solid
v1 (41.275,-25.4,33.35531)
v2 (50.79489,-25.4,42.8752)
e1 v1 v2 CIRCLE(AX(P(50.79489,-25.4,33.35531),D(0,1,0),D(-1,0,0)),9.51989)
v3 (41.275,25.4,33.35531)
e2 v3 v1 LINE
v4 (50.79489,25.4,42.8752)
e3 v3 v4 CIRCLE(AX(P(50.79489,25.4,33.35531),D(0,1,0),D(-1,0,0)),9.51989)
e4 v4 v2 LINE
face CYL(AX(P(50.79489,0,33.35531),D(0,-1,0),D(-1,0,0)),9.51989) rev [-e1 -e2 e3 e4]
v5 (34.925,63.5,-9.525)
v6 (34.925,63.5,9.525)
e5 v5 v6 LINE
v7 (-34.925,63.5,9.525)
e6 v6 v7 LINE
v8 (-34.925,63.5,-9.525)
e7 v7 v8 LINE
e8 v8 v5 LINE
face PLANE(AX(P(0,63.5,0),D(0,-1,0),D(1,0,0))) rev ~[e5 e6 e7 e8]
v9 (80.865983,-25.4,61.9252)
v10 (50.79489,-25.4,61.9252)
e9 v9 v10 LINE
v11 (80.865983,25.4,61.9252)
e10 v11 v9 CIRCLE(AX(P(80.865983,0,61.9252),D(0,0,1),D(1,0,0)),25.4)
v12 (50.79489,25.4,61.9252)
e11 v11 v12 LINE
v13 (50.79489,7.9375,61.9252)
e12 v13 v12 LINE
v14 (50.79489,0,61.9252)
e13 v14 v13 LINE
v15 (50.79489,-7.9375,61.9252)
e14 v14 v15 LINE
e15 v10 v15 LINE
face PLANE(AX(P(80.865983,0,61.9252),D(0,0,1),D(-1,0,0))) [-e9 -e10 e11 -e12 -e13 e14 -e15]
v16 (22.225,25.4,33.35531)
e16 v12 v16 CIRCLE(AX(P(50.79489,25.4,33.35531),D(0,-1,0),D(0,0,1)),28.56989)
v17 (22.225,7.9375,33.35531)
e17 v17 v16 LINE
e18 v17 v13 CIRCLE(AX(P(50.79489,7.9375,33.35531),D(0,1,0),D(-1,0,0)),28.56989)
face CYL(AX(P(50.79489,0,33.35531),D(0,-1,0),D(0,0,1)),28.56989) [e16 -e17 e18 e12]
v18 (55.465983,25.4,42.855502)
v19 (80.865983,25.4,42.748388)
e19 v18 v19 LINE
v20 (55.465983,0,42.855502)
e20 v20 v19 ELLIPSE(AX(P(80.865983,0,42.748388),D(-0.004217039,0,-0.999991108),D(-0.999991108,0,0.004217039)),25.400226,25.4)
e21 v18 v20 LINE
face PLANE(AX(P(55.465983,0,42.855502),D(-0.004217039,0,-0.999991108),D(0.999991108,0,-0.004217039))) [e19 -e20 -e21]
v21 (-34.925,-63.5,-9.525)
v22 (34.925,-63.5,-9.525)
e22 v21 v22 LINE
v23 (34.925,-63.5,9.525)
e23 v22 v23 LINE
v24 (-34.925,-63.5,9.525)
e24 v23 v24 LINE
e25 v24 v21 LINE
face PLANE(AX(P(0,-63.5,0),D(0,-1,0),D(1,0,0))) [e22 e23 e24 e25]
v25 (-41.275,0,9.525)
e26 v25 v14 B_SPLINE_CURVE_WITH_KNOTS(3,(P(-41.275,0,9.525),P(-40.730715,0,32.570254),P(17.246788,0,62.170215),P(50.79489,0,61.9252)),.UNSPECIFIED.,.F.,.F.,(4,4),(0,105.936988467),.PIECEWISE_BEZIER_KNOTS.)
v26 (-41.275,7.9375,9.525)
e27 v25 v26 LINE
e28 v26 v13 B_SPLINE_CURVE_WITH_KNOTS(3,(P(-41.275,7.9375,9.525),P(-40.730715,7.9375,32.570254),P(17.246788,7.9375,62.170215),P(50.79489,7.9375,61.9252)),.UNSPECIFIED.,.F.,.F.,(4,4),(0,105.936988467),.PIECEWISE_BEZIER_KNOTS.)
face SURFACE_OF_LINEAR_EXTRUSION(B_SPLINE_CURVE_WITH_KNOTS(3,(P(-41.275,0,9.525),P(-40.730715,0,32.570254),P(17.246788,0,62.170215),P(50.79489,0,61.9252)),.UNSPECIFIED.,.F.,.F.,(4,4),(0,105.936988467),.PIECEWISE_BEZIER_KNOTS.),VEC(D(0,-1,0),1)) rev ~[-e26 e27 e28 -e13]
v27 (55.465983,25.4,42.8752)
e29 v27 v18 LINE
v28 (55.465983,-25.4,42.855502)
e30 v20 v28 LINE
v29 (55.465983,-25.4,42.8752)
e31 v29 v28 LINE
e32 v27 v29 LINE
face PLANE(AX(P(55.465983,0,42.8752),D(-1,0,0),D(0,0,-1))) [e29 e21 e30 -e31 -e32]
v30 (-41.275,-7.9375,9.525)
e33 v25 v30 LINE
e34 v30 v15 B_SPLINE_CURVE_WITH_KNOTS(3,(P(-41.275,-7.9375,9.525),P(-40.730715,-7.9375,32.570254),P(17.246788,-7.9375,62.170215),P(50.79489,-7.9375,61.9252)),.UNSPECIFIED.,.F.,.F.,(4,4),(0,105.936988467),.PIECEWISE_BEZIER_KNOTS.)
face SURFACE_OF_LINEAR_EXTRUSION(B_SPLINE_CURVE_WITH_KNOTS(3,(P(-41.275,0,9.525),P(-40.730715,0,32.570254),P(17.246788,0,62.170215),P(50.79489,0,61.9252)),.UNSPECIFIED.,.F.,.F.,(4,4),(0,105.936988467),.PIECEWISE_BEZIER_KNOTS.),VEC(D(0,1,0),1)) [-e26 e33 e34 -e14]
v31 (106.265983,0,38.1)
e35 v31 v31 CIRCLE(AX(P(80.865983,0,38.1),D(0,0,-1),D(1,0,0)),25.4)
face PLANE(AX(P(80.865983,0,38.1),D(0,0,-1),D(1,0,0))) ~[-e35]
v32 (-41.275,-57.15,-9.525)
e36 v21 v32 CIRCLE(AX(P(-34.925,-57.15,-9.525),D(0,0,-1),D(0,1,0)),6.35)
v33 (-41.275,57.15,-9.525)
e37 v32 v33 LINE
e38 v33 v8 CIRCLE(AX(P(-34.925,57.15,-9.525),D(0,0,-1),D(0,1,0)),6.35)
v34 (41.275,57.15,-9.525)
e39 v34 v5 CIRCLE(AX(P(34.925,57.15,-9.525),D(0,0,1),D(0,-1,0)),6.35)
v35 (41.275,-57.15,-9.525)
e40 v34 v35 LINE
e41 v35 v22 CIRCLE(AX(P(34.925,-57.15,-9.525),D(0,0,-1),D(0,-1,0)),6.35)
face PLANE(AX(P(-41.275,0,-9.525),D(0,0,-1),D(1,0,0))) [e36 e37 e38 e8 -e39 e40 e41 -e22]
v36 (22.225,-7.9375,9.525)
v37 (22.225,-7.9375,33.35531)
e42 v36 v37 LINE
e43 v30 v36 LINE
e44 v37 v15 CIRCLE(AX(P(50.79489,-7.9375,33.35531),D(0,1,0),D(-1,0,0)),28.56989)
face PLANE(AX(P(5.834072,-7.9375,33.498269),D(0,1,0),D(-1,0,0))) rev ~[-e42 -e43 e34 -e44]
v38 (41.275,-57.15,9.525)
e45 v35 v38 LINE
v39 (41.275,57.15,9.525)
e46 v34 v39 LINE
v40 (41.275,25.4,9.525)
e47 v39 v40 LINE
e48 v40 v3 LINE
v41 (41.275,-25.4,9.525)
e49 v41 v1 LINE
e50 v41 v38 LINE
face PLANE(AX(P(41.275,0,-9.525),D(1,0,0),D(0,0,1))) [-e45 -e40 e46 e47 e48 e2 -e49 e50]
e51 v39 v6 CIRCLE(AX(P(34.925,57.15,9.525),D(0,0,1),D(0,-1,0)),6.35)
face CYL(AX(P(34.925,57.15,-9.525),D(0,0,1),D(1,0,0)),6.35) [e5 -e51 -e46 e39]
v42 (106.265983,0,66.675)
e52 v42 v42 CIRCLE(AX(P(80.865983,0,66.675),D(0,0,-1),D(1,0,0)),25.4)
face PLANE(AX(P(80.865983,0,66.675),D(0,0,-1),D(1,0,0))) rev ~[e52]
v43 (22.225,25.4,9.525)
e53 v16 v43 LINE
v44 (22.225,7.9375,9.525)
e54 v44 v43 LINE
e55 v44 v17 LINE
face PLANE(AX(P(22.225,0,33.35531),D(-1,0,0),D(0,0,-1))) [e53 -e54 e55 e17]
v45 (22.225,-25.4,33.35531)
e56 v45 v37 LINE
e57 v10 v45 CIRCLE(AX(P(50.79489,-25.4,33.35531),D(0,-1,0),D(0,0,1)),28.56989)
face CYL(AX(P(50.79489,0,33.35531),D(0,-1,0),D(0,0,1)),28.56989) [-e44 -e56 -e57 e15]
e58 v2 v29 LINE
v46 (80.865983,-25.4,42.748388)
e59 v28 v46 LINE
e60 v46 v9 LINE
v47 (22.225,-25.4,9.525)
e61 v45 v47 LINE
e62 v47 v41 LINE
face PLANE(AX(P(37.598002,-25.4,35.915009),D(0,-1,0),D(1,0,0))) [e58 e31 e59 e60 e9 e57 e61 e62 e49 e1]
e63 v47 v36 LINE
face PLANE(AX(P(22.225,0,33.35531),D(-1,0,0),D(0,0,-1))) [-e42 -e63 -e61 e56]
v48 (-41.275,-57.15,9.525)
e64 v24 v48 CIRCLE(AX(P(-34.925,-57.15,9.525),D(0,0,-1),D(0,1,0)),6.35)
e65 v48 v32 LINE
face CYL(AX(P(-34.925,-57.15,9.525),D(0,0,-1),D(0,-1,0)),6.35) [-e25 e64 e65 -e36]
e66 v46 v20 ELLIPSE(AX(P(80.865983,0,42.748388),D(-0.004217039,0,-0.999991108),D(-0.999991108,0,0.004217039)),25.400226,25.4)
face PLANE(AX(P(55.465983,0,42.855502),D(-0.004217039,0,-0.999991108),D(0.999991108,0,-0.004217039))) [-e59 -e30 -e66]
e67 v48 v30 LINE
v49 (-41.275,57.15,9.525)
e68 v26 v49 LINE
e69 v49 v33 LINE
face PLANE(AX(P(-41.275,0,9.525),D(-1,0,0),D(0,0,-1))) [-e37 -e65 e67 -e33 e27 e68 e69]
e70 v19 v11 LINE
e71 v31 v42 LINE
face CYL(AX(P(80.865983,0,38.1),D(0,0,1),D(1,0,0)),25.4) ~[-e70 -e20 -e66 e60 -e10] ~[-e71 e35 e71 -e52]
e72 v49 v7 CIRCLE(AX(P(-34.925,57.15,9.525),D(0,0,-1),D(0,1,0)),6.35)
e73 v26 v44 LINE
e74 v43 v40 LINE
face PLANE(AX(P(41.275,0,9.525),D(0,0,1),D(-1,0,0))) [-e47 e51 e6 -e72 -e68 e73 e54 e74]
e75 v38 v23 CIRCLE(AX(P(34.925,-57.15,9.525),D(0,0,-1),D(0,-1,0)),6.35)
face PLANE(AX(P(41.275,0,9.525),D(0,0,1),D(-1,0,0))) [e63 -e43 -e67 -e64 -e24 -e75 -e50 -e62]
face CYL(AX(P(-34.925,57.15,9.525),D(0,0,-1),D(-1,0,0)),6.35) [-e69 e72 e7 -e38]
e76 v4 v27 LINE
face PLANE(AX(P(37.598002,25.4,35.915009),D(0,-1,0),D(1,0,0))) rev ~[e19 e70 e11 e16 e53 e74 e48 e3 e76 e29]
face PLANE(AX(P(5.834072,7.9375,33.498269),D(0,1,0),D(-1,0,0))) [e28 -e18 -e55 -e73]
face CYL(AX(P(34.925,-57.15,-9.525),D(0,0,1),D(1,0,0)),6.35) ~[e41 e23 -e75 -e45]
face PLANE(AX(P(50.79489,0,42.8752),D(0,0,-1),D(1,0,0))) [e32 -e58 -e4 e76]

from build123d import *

# Parameters (mm, degrees)
F1_DEPTH = 63.5
F2_DEPTH = 25.4
F3_DEPTH = 7.9375
F5_R     = 6.35


with BuildPart() as f1:
    # F0 (on Front) → F1 (new body, symmetric)
    with BuildSketch(Plane.XZ):
        Polygon((-41.275, -9.525), (41.275, -9.525), (41.275, 9.525), (22.225, 9.525), (-41.275, 9.525), align=None)
    extrude(amount=F1_DEPTH, both=True)

    # F0 (on Front) → F2 (join, symmetric)
    with BuildSketch(Plane.XZ):
        with BuildLine():
            Line((22.225, 9.525), (41.275, 9.525))
            Line((41.275, 9.525), (41.275, 33.3553104297))
            ThreePointArc((41.275, 33.3553104297), (44.063311099, 40.086888901), (50.7948895703, 42.8752))
            Line((50.7948895703, 42.8752), (55.4659834841, 42.8752))
            Line((55.4659834841, 42.8752), (55.4659834841, 61.9252))
            Line((55.4659834841, 61.9252), (50.7948895703, 61.9252))
            ThreePointArc((50.7948895703, 61.9252), (30.5929269174, 53.5572730826), (22.225, 33.3553104297))
            Line((22.225, 33.3553104297), (22.225, 9.525))
        make_face()
        Polygon((70.8683976346, 61.9252), (55.4659834841, 61.9252), (55.4659834841, 42.8752), (55.4659834841, 42.8555016406), (80.8659834841, 42.748387903), (80.8659834841, 61.9252), align=None)
    extrude(amount=F2_DEPTH, both=True)

    # F0 (on Front) → F3 (join, symmetric)
    with BuildSketch(Plane.XZ):
        with BuildLine():
            add(Edge.make_bspline(
                [(-41.275, 9.525), (-40.730714798, 32.5702540576), (17.2467883676, 62.170214951), (50.7948895703, 61.9252)],
                knots=[0, 0, 0, 0, 105.9369884673, 105.9369884673, 105.9369884673, 105.9369884673], degree=3))
            Line((-41.275, 9.525), (22.225, 9.525))
            Line((22.225, 9.525), (22.225, 33.3553104297))
            ThreePointArc((22.225, 33.3553104297), (30.5929269174, 53.5572730826), (50.7948895703, 61.9252))
        make_face()
    extrude(amount=F3_DEPTH, both=True)

    # F0 (on Front) → F4 (revolve)
    with BuildSketch(Plane.XZ):
        Polygon((80.8659834841, 61.9252), (80.8659834841, 42.748387903), (80.8659834841, 38.1), (106.2659834841, 38.1), (106.2659834841, 66.675), (80.8659834841, 66.675), align=None)
    revolve(axis=Axis((80.8659834841, 0, 52.3875), (0, 0, -1)))

    # F5
    f5_edges = [f1.edges().sort_by_distance(p)[0] for p in [
        (-41.275, -63.5, 0),
        (41.275, -63.5, 0),
        (41.275, 63.5, 0),
        (-41.275, 63.5, 0),
    ]]
    fillet(f5_edges, radius=F5_R)


solid = f1.part
